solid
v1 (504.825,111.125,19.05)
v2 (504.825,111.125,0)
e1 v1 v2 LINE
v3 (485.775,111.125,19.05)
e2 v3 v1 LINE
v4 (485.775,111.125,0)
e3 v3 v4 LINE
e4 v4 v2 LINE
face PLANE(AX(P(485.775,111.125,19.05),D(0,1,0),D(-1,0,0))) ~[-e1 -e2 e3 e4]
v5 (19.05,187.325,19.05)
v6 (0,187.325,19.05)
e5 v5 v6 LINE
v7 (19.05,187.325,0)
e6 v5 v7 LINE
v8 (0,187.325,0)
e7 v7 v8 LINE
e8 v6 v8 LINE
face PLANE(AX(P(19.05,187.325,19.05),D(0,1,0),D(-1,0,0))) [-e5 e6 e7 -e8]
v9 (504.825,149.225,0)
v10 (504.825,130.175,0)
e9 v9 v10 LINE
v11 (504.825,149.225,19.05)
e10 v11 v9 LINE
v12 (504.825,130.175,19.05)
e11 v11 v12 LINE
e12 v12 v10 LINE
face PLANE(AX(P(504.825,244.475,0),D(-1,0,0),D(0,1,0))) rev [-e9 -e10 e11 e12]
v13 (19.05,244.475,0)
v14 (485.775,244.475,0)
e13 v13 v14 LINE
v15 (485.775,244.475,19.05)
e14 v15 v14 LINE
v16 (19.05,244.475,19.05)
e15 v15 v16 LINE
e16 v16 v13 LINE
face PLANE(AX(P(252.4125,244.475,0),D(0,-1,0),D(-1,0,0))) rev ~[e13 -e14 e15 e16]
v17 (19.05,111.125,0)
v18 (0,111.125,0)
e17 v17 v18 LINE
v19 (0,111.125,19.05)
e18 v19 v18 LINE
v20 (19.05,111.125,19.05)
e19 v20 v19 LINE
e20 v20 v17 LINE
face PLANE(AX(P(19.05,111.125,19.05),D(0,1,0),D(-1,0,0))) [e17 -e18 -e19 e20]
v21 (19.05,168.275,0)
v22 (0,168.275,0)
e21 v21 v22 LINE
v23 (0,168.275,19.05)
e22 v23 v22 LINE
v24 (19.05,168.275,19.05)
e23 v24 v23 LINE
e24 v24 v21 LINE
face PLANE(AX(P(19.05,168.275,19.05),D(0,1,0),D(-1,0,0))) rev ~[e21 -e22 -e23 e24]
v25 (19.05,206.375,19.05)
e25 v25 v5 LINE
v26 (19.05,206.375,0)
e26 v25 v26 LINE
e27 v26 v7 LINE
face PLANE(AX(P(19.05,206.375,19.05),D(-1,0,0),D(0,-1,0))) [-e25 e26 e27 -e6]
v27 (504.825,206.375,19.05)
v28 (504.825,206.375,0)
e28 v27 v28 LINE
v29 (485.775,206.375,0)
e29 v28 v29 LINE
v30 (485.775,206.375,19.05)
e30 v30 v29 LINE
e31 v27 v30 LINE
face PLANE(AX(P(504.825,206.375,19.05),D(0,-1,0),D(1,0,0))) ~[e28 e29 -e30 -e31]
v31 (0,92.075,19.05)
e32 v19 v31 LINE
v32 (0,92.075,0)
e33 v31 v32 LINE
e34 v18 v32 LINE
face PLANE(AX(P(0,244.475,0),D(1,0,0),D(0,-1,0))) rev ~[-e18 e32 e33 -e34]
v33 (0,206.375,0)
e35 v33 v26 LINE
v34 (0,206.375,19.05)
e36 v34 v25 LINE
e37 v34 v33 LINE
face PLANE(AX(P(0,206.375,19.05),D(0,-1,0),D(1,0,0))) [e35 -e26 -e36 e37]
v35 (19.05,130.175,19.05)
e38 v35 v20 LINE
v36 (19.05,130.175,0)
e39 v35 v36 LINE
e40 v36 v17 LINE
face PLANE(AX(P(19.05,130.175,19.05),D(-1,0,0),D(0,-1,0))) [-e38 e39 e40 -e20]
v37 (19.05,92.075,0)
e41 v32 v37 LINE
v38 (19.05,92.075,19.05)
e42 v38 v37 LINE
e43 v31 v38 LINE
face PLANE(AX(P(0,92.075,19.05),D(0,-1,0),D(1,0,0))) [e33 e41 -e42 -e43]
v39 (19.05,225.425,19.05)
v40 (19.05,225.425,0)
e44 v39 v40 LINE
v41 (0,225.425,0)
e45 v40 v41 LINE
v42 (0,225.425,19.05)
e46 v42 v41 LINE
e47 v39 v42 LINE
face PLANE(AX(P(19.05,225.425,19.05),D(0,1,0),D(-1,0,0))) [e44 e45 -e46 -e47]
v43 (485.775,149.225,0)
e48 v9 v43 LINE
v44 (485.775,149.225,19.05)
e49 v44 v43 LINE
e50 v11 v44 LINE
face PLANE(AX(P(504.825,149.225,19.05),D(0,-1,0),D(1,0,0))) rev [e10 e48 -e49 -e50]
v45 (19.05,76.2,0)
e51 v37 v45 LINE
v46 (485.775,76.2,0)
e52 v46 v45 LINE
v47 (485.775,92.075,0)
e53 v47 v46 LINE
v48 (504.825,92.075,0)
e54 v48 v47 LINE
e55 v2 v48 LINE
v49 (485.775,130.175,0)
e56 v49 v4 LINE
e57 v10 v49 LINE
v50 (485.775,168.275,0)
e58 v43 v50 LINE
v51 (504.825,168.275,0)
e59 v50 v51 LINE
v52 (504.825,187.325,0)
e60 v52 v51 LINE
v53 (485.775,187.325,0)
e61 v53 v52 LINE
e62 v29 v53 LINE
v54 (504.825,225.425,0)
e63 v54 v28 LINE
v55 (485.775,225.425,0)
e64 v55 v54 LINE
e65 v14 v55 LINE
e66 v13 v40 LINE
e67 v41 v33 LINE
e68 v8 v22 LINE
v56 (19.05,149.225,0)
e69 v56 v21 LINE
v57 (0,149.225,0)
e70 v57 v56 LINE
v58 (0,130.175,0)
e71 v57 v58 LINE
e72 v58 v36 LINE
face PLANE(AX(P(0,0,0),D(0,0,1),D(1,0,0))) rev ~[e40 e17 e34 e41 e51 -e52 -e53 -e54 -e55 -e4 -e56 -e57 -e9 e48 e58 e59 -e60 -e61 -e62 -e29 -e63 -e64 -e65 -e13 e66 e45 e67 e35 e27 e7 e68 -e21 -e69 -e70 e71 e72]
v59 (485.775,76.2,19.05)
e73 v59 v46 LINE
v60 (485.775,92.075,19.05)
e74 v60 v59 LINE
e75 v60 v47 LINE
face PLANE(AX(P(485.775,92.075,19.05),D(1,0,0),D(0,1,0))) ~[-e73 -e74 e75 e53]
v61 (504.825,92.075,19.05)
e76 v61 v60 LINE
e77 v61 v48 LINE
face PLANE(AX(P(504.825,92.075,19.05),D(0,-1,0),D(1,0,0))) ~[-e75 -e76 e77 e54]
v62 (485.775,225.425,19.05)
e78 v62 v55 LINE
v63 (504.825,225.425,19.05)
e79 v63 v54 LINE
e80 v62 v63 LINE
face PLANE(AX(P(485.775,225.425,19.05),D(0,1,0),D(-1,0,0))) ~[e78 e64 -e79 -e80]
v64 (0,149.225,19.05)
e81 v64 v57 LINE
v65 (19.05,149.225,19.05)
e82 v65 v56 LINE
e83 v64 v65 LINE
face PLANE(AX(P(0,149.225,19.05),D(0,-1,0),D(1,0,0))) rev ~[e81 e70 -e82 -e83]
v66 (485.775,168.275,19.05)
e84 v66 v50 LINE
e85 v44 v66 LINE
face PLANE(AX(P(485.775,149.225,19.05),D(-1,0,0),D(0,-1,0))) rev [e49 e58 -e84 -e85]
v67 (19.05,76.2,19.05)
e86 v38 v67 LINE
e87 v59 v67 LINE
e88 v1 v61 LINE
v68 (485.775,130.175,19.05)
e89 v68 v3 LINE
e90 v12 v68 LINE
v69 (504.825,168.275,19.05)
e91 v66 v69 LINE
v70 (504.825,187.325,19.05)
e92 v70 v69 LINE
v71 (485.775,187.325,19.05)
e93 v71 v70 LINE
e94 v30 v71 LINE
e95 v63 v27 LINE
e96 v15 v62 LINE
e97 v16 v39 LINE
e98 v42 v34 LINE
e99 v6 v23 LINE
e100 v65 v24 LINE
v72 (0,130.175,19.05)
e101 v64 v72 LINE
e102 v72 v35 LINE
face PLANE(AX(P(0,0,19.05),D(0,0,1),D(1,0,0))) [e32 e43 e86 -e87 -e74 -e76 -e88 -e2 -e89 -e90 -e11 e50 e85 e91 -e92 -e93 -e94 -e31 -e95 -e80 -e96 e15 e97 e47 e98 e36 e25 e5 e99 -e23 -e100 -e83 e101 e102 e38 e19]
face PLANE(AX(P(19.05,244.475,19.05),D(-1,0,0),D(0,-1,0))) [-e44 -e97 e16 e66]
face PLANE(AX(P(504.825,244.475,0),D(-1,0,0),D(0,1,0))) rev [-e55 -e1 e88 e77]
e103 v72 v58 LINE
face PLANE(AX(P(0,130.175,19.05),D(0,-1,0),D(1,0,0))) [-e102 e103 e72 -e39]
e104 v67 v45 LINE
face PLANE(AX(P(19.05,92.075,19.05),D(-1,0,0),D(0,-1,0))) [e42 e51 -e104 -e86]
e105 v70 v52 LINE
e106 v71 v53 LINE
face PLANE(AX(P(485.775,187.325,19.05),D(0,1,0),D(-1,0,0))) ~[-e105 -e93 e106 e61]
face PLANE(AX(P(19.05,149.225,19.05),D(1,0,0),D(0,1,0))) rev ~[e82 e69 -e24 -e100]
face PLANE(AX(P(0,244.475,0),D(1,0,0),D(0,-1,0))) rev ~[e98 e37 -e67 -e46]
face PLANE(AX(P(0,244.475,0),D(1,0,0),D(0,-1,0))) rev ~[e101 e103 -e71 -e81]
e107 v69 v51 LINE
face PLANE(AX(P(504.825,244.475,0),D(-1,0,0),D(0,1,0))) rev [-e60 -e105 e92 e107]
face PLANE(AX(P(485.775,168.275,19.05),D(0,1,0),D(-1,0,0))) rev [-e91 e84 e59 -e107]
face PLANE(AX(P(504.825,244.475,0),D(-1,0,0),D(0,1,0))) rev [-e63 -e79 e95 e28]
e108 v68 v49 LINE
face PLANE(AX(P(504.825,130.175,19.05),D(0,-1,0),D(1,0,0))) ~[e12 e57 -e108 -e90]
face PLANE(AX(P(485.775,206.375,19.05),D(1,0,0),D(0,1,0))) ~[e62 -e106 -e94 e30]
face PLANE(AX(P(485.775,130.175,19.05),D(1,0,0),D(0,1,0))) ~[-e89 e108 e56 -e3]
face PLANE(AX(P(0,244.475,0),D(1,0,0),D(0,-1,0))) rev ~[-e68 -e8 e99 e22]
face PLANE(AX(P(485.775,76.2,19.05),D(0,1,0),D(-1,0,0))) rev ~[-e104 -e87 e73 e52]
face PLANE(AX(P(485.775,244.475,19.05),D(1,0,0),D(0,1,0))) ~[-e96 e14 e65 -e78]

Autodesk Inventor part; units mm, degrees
ref_plane "YZ Plane" through (0, 0, 0) normal (1, 0, 0) x (0, 1, 0)
ref_plane "XZ Plane" through (0, 0, 0) normal (0, 1, 0) x (-1, 0, 0)
ref_plane "XY Plane" through (0, 0, 0) normal (0, 0, 1) x (1, 0, 0)
sketch "Sketch1" plane through (0, 0, 0) normal (0, 0, 1) x (1, 0, 0)
  line L0 (0, 0) -> (252.4125, 0)
  line L1 (252.4125, 0) -> (252.4125, 244.475)
  line L2 (252.4125, 244.475) -> (0, 244.475)
  line L3 (0, 244.475) -> (0, 0)
  dimension "d0" = 252.4125
  dimension "d1" = 244.475
extrude "Extrusion1" add sketch "Sketch1" along normal blind 19.05
sketch "Sketch3" plane through (0, 0, 19.05) normal (0, 0, 1) x (1, 0, 0)
  line L0 (0, 0) -> (252.4125, 0) projected
  line L1 (252.4125, 244.475) -> (0, 244.475) projected
  line L2 (0, 244.475) -> (0, 0) projected
  line L3 (0, 244.475) -> (19.05, 244.475)
  line L4 (19.05, 244.475) -> (19.05, 225.425)
  line L5 (19.05, 225.425) -> (0, 225.425)
  line L6 (0, 225.425) -> (0, 244.475)
  line L7 (19.05, 168.275) -> (0, 168.275)
  line L8 (0, 168.275) -> (0, 149.225)
  line L9 (0, 149.225) -> (19.05, 149.225)
  line L10 (19.05, 149.225) -> (19.05, 168.275)
  line L11 (0, 130.175) -> (19.05, 130.175)
  line L12 (19.05, 130.175) -> (19.05, 111.125)
  line L13 (19.05, 111.125) -> (0, 111.125)
  line L14 (0, 111.125) -> (0, 130.175)
  line L15 (0, 206.375) -> (19.05, 206.375)
  line L16 (19.05, 206.375) -> (19.05, 187.325)
  line L17 (19.05, 187.325) -> (0, 187.325)
  line L18 (0, 187.325) -> (0, 206.375)
  line L19 (0, 92.075) -> (19.05, 92.075)
  line L20 (19.05, 92.075) -> (19.05, 73.025)
  line L21 (19.05, 73.025) -> (0, 73.025)
  line L22 (0, 73.025) -> (0, 92.075)
  line L23 (0, 53.975) -> (19.05, 53.975)
  line L24 (19.05, 53.975) -> (19.05, 34.925)
  line L25 (19.05, 34.925) -> (0, 34.925)
  line L26 (0, 34.925) -> (0, 53.975)
  line L27 (0, 15.875) -> (19.05, 15.875)
  line L28 (19.05, 15.875) -> (19.05, -3.175)
  line L29 (19.05, -3.175) -> (0, -3.175)
  line L30 (0, -3.175) -> (0, 15.875)
  dimension "d4" = 19.05
  dimension "d5" = 19.05
  dimension "d6" = 244.475
  dimension "d7" = 19.05
  dimension "d8" = 19.05
  dimension "d9" = 19.05
  dimension "d10" = 19.05
  dimension "d11" = 19.05
  dimension "d12" = 19.05
  dimension "d13" = 19.05
  dimension "d14" = 19.05
  dimension "d15" = 19.05
  dimension "d16" = 19.05
  dimension "d17" = 19.05
  dimension "d18" = 19.05
  dimension "d19" = 19.05
  dimension "d20" = 19.05
  dimension "d21" = 19.05
  dimension "d22" = 19.05
  dimension "d23" = 19.05
  dimension "d24" = 15.875
extrude "Extrusion2" cut sketch "Sketch3" against normal through all
mirror "Mirror1" about plane through (252.4125, 0, 0) normal (1, 0, 0)
sketch "Sketch6" plane through (0, 0, 19.05) normal (0, 0, 1) x (1, 0, 0)
  line L0 (19.05, 34.925) -> (0, 34.925) projected
  line L1 (0, 34.925) -> (0, 15.875) projected
  line L2 (0, 15.875) -> (19.05, 15.875) projected
  line L3 (19.05, 15.875) -> (19.05, 0) projected
  line L4 (19.05, 0) -> (485.775, 0) projected
  line L5 (485.775, 15.875) -> (485.775, 0) projected
  line L6 (504.825, 15.875) -> (485.775, 15.875) projected
  line L7 (504.825, 34.925) -> (504.825, 15.875) projected
  line L8 (485.775, 34.925) -> (504.825, 34.925) projected
  line L9 (485.775, 53.975) -> (485.775, 34.925) projected
  line L10 (504.825, 53.975) -> (485.775, 53.975) projected
  line L11 (504.825, 73.025) -> (504.825, 53.975) projected
  line L12 (485.775, 73.025) -> (504.825, 73.025) projected
  line L13 (485.775, 92.075) -> (485.775, 73.025) projected
  line L14 (19.05, 92.075) -> (19.05, 73.025) projected
  line L15 (19.05, 73.025) -> (0, 73.025) projected
  line L16 (0, 73.025) -> (0, 53.975) projected
  line L17 (0, 53.975) -> (19.05, 53.975) projected
  line L18 (19.05, 53.975) -> (19.05, 34.925) projected
  line L19 (504.825, 76.2) -> (19.05, 76.2)
  line L20 (19.05, 76.2) -> (485.775, 76.2)
  line L21 (19.05, 244.475) -> (485.775, 244.475) projected
  point P0 (0, 0)
  dimension "d54" = 168.275
extrude "Extrusion3" cut sketch "Sketch6" against normal through all
properties part number "deep_side" material "Wood (Birch)"
